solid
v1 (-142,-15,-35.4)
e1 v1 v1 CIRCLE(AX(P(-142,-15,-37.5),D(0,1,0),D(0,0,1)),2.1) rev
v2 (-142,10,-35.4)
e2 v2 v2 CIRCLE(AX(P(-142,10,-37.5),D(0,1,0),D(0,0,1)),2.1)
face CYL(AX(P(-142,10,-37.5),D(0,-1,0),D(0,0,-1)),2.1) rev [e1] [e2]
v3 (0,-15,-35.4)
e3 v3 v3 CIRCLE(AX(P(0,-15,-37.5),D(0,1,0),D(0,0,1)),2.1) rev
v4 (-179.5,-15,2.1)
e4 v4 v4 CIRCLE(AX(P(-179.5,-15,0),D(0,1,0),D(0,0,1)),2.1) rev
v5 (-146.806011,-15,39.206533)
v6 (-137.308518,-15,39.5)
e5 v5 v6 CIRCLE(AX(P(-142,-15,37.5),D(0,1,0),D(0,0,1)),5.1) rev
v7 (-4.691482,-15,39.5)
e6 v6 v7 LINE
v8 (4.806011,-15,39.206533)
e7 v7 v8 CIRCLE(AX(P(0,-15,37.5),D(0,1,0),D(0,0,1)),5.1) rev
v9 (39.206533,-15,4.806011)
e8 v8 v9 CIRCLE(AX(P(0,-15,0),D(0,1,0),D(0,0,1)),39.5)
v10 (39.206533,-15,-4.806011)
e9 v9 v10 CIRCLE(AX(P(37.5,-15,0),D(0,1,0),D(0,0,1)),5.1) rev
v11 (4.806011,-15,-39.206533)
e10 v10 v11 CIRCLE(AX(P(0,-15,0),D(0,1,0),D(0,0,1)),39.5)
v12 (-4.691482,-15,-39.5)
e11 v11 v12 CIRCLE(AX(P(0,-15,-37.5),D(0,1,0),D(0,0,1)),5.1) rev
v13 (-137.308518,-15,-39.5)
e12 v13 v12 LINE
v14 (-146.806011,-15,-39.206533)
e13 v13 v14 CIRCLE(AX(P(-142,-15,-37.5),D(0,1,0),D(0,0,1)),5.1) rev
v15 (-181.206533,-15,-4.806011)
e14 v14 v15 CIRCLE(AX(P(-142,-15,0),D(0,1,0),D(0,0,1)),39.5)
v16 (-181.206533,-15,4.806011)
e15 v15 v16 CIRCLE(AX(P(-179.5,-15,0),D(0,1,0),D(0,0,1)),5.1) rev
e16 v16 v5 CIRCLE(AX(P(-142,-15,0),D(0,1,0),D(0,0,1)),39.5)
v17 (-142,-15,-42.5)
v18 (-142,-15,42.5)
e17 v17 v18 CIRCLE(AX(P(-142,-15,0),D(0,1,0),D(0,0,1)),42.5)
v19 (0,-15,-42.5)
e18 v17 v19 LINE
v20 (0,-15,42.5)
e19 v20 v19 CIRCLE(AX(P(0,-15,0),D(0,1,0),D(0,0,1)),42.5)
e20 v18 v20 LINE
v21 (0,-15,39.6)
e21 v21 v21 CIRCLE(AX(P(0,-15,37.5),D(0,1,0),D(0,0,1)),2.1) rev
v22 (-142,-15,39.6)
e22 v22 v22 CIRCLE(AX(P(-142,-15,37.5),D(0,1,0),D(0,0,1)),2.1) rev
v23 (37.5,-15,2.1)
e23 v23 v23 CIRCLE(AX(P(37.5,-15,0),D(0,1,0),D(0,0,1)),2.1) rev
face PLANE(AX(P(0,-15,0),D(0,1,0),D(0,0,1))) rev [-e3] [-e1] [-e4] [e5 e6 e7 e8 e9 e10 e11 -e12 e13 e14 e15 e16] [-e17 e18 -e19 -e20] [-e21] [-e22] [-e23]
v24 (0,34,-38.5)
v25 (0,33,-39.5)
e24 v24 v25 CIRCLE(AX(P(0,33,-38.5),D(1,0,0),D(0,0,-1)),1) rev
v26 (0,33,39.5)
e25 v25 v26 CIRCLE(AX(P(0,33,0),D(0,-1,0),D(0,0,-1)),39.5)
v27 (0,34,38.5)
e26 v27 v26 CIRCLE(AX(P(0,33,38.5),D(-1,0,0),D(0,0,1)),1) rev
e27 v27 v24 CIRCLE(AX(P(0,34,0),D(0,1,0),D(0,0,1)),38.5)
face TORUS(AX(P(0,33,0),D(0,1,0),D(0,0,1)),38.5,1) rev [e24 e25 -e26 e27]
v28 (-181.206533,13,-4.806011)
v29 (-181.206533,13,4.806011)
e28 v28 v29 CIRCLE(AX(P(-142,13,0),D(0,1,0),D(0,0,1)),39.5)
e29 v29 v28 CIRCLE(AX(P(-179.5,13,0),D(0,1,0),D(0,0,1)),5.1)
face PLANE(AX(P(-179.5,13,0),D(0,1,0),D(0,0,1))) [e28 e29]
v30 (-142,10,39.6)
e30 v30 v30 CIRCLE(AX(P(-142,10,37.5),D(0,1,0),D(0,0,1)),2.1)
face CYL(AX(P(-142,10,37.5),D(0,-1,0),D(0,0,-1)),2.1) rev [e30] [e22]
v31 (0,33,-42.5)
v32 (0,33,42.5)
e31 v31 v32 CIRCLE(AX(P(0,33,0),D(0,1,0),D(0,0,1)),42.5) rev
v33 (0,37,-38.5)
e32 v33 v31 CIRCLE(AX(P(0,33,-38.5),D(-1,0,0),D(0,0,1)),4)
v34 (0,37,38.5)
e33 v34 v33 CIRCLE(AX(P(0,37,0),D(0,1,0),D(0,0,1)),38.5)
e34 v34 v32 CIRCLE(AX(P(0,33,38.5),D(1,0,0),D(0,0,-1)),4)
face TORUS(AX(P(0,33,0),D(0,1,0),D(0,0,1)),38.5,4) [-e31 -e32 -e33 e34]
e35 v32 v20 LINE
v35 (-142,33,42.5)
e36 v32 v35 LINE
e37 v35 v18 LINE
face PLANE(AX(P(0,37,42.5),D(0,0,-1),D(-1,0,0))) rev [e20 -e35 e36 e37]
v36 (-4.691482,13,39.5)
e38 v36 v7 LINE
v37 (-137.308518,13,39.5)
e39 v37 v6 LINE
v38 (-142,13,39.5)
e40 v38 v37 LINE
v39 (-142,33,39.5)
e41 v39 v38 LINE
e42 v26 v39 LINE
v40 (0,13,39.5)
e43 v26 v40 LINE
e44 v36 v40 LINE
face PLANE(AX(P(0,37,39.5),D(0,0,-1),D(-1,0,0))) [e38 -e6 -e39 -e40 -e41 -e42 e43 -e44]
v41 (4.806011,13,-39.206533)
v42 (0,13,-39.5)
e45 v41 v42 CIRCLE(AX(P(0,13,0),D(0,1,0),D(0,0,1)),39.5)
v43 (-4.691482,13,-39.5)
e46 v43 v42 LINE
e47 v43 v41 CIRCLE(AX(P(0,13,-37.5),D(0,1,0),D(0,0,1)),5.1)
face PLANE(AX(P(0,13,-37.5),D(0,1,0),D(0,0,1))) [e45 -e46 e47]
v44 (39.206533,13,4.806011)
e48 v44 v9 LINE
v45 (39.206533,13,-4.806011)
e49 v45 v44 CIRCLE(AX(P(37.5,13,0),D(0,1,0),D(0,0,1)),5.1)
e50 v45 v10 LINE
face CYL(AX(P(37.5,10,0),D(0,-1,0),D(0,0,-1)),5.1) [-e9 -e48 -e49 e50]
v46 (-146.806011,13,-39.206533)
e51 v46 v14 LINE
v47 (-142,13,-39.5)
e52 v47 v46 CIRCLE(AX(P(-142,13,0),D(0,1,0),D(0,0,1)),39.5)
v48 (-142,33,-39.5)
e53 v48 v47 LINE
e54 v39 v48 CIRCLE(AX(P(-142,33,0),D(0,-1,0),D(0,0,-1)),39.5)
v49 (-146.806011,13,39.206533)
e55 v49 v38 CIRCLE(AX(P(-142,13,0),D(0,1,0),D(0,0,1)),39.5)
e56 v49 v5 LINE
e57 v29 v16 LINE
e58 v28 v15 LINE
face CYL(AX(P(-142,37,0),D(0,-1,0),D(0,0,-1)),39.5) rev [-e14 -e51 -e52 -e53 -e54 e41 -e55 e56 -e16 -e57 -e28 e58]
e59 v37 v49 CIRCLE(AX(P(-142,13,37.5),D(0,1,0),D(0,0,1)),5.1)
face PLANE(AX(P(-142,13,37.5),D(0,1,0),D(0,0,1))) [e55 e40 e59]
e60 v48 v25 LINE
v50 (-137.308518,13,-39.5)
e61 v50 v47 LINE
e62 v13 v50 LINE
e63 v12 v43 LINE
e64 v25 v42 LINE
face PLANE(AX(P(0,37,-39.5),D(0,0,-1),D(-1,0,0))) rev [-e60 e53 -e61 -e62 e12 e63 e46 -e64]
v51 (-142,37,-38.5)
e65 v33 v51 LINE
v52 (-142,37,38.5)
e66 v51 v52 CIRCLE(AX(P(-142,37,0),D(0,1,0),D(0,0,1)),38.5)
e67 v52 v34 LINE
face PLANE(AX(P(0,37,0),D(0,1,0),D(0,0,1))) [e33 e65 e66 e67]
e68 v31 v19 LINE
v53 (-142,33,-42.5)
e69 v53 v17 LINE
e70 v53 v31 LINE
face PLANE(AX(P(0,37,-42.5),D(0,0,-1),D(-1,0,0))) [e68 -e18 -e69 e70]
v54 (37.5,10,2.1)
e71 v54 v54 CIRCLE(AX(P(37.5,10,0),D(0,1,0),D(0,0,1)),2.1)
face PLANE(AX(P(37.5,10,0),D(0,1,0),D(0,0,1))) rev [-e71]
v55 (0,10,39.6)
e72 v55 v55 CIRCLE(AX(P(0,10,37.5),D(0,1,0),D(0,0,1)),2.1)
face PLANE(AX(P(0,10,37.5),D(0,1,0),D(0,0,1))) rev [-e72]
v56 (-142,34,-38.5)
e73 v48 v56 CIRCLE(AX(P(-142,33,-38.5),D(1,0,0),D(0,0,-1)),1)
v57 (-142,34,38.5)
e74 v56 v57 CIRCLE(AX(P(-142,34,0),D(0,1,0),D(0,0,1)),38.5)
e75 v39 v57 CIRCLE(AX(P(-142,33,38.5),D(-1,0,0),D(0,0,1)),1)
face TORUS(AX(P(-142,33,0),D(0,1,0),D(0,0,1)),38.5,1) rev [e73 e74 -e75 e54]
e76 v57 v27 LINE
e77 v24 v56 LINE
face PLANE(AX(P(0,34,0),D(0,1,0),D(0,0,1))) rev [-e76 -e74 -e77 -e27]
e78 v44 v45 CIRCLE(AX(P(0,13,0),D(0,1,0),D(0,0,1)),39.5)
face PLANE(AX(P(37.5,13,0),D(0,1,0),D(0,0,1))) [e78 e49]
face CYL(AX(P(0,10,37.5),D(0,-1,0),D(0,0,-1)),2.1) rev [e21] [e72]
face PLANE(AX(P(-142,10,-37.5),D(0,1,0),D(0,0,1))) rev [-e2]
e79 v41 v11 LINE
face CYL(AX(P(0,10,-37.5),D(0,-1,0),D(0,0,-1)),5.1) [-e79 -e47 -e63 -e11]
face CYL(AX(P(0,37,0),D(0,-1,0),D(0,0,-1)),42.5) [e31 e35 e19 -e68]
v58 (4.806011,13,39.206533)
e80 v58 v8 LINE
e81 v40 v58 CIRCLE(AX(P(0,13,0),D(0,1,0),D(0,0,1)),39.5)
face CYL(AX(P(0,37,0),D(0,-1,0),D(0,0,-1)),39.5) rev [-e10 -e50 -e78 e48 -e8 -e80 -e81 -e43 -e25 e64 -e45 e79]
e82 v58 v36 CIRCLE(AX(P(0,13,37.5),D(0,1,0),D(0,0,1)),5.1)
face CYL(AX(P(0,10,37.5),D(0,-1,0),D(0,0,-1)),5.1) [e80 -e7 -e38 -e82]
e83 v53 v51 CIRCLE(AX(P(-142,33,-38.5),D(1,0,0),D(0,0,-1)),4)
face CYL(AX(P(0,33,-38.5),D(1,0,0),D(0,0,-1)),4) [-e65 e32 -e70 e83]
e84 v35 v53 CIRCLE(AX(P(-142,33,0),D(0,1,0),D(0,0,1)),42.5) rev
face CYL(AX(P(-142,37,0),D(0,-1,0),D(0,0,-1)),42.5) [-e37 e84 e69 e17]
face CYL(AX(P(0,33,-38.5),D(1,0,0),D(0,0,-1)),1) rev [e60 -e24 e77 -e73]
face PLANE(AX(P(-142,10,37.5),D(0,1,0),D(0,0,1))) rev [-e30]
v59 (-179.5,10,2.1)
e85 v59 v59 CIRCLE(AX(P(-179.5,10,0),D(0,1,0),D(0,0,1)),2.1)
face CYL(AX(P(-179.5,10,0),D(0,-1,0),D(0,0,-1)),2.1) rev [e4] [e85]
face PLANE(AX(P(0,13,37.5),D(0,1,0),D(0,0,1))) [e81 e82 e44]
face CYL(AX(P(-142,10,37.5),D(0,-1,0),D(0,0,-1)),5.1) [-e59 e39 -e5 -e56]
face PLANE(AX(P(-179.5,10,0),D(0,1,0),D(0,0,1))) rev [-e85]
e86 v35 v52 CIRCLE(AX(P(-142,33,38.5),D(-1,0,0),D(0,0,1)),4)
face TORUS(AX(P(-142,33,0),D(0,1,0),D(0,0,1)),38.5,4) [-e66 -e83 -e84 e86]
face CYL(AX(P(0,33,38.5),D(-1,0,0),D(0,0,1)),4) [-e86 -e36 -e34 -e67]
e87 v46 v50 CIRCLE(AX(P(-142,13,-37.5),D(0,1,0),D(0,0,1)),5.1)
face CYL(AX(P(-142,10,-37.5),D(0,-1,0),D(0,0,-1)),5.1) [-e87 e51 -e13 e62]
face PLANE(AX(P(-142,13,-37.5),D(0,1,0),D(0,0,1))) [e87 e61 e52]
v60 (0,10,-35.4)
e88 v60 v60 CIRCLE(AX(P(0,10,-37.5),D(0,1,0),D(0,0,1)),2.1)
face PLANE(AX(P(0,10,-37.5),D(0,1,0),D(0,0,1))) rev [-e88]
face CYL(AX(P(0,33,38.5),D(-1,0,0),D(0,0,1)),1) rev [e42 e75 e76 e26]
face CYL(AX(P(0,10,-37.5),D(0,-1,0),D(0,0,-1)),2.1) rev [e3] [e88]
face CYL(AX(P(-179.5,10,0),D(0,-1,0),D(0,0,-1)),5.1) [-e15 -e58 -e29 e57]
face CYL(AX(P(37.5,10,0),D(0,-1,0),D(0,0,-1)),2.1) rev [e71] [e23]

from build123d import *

# Parameters (mm, degrees)
BOSS_EXTRUDE1_DEPTH      = 37
BOSS_EXTRUDE1_DEPTH_BACK = 15
CUT_EXTRUDE1_DEPTH       = 10
CUT_EXTRUDE1_DEPTH_BACK  = 20
SKETCH2_R                = 2.1
FILLET1_R                = 4
SHELL2_START             = -15
SHELL2_DEPTH             = 47.999999899
SHELL2_START_2           = 13
SHELL2_2_DEPTH           = 19.999999899
SHELL2_START_3           = -142
SHELL2_3_DEPTH           = 142
SHELL2_4_ANGLE           = 180
SHELL2_5_ANGLE           = 180


with BuildPart() as part:
    # Sketch1 → Boss-Extrude1 (new, two sides: drawn at the far end of the back side and taken through both)
    with BuildSketch(Plane(origin=(0, 0, 0), x_dir=(1, 0, 0), z_dir=(0, 1, 0)).offset(-BOSS_EXTRUDE1_DEPTH_BACK)):
        with BuildLine():
            Line((0, 42.5), (-142, 42.5))
            ThreePointArc((-142, 42.5), (-184.5, 0), (-142, -42.5))
            Line((-142, -42.5), (0, -42.5))
            ThreePointArc((0, -42.5), (42.5, 0), (0, 42.5))
        make_face()
    extrude(amount=BOSS_EXTRUDE1_DEPTH + BOSS_EXTRUDE1_DEPTH_BACK)

    # Sketch2 → Cut-Extrude1 (cut, two sides: drawn at the far end of the back side and taken through both)
    with BuildSketch(Plane(origin=(0, 0, 0), x_dir=(1, 0, 0), z_dir=(0, 1, 0)).offset(-CUT_EXTRUDE1_DEPTH_BACK)):
        with Locations(Location((-142, 37.5, 0), (0, 0, 270))):
            Circle(SKETCH2_R)
        with Locations(Location((-179.5, 0, 0), (0, 0, 270))):
            Circle(SKETCH2_R)
        with Locations(Location((-142, -37.5, 0), (0, 0, 270))):
            Circle(SKETCH2_R)
        with Locations(Location((0, -37.5, 0), (0, 0, 270))):
            Circle(SKETCH2_R)
        with Locations(Location((37.5, 0, 0), (0, 0, 270))):
            Circle(SKETCH2_R)
        with Locations(Location((0, 37.5, 0), (0, 0, 270))):
            Circle(SKETCH2_R)
    extrude(amount=CUT_EXTRUDE1_DEPTH + CUT_EXTRUDE1_DEPTH_BACK, mode=Mode.SUBTRACT)

    # Fillet1
    fillet1_edges = [part.edges().sort_by_distance(p)[0] for p in [
        (-71, 37, 42.5),
        (42.5, 37, 0),
        (-71, 37, -42.5),
        (-184.5, 37, 0),
    ]]
    fillet(fillet1_edges, radius=FILLET1_R)

    # Shell2: read off the stored shape, not the designer's step
    # Shell2 outline → Shell2 (cut)
    with BuildSketch(Plane(origin=(0, 0, 0), x_dir=(1, 0, 0), z_dir=(0, 1, 0)).offset(SHELL2_START)):
        with BuildLine():
            ThreePointArc((4.806011234, 39.206533333), (-0.157511676, 32.402432926), (-4.691481642, 39.5))
            Line((-4.691481642, 39.5), (-137.308518358, 39.5))
            ThreePointArc((-137.308518358, 39.5), (-141.842488324, 32.402432926), (-146.806011234, 39.206533333))
            ThreePointArc((-146.806011234, 39.206533333), (-169.930717857, 27.930717857), (-181.206533333, 4.806011234))
            ThreePointArc((-181.206533333, 4.806011234), (-174.4, 0), (-181.206533333, -4.806011234))
            ThreePointArc((-181.206533333, -4.806011234), (-169.930717857, -27.930717857), (-146.806011234, -39.206533333))
            ThreePointArc((-146.806011234, -39.206533333), (-141.842488324, -32.402432926), (-137.308518358, -39.5))
            Line((-137.308518358, -39.5), (-4.691481642, -39.5))
            ThreePointArc((-4.691481642, -39.5), (-0.157511676, -32.402432926), (4.806011234, -39.206533333))
            ThreePointArc((4.806011234, -39.206533333), (27.930717857, -27.930717857), (39.206533333, -4.806011234))
            ThreePointArc((39.206533333, -4.806011234), (32.4, 0), (39.206533333, 4.806011234))
            ThreePointArc((39.206533333, 4.806011234), (27.930717857, 27.930717857), (4.806011234, 39.206533333))
        make_face()
    extrude(amount=SHELL2_DEPTH, mode=Mode.SUBTRACT)

    # Shell2 2 outline → Shell2 2 (cut)
    with BuildSketch(Plane(origin=(0, 0, 0), x_dir=(1, 0, 0), z_dir=(0, 1, 0)).offset(SHELL2_START_2)):
        with BuildLine():
            ThreePointArc((4.806011234, 39.206533333), (2.407481395, 39.426565071), (0, 39.5))
            Line((0, 39.5), (-4.691481642, 39.5))
            ThreePointArc((-4.691481642, 39.5), (-0.157511676, 32.402432926), (4.806011234, 39.206533333))
        make_face()
        with BuildLine():
            ThreePointArc((-146.806011234, 39.206533333), (-141.842488324, 32.402432926), (-137.308518358, 39.5))
            Line((-137.308518358, 39.5), (-142, 39.5))
            ThreePointArc((-142, 39.5), (-144.407481395, 39.426565071), (-146.806011234, 39.206533333))
        make_face()
        with BuildLine():
            ThreePointArc((39.206533333, -4.806011234), (39.5, 0), (39.206533333, 4.806011234))
            ThreePointArc((39.206533333, 4.806011234), (32.4, 0), (39.206533333, -4.806011234))
        make_face()
        with BuildLine():
            ThreePointArc((-181.206533333, -4.806011234), (-174.4, 0), (-181.206533333, 4.806011234))
            ThreePointArc((-181.206533333, 4.806011234), (-181.5, 0), (-181.206533333, -4.806011234))
        make_face()
        with BuildLine():
            ThreePointArc((0, -39.5), (2.407481395, -39.426565071), (4.806011234, -39.206533333))
            ThreePointArc((4.806011234, -39.206533333), (-0.157511676, -32.402432926), (-4.691481642, -39.5))
            Line((-4.691481642, -39.5), (0, -39.5))
        make_face()
        with BuildLine():
            ThreePointArc((-137.308518358, -39.5), (-141.842488324, -32.402432926), (-146.806011234, -39.206533333))
            ThreePointArc((-146.806011234, -39.206533333), (-144.407481395, -39.426565071), (-142, -39.5))
            Line((-142, -39.5), (-137.308518358, -39.5))
        make_face()
    extrude(amount=SHELL2_2_DEPTH, mode=Mode.SUBTRACT)

    # Shell2 3 outline → Shell2 3 (cut)
    with BuildSketch(Plane.YZ.offset(SHELL2_START_3)):
        with BuildLine():
            ThreePointArc((33, -39.5), (33.707106781, -39.207106781), (34, -38.5))
            Line((34, -38.5), (34, 38.5))
            ThreePointArc((34, 38.5), (33.707106781, 39.207106781), (33, 39.5))
            Line((33, 39.5), (33, -39.5))
        make_face()
    extrude(amount=SHELL2_3_DEPTH, mode=Mode.SUBTRACT)

    # Shell2 4 outline → Shell2 4 (revolve, cut)
    with BuildSketch(Plane(origin=(-142, 0, 0), x_dir=(0, 0, -1), z_dir=(1, 0, 0))):
        with BuildLine():
            ThreePointArc((39.5, 33), (39.207106781, 33.707106781), (38.5, 34))
            Line((38.5, 34), (0, 34))
            Line((0, 34), (0, 33))
            Line((0, 33), (39.5, 33))
        make_face()
    revolve(axis=Axis((-142, 0, 0), (0, 1, 0)), revolution_arc=SHELL2_4_ANGLE, mode=Mode.SUBTRACT)

    # Shell2 5 outline → Shell2 5 (revolve, cut)
    with BuildSketch(Plane.ZY):
        with BuildLine():
            ThreePointArc((39.5, 33), (39.207106781, 33.707106781), (38.5, 34))
            Line((38.5, 34), (0, 34))
            Line((0, 34), (0, 33))
            Line((0, 33), (39.5, 33))
        make_face()
    revolve(axis=Axis((0, 0, 0), (0, 1, 0)), revolution_arc=SHELL2_5_ANGLE, mode=Mode.SUBTRACT)


solid = part.part
